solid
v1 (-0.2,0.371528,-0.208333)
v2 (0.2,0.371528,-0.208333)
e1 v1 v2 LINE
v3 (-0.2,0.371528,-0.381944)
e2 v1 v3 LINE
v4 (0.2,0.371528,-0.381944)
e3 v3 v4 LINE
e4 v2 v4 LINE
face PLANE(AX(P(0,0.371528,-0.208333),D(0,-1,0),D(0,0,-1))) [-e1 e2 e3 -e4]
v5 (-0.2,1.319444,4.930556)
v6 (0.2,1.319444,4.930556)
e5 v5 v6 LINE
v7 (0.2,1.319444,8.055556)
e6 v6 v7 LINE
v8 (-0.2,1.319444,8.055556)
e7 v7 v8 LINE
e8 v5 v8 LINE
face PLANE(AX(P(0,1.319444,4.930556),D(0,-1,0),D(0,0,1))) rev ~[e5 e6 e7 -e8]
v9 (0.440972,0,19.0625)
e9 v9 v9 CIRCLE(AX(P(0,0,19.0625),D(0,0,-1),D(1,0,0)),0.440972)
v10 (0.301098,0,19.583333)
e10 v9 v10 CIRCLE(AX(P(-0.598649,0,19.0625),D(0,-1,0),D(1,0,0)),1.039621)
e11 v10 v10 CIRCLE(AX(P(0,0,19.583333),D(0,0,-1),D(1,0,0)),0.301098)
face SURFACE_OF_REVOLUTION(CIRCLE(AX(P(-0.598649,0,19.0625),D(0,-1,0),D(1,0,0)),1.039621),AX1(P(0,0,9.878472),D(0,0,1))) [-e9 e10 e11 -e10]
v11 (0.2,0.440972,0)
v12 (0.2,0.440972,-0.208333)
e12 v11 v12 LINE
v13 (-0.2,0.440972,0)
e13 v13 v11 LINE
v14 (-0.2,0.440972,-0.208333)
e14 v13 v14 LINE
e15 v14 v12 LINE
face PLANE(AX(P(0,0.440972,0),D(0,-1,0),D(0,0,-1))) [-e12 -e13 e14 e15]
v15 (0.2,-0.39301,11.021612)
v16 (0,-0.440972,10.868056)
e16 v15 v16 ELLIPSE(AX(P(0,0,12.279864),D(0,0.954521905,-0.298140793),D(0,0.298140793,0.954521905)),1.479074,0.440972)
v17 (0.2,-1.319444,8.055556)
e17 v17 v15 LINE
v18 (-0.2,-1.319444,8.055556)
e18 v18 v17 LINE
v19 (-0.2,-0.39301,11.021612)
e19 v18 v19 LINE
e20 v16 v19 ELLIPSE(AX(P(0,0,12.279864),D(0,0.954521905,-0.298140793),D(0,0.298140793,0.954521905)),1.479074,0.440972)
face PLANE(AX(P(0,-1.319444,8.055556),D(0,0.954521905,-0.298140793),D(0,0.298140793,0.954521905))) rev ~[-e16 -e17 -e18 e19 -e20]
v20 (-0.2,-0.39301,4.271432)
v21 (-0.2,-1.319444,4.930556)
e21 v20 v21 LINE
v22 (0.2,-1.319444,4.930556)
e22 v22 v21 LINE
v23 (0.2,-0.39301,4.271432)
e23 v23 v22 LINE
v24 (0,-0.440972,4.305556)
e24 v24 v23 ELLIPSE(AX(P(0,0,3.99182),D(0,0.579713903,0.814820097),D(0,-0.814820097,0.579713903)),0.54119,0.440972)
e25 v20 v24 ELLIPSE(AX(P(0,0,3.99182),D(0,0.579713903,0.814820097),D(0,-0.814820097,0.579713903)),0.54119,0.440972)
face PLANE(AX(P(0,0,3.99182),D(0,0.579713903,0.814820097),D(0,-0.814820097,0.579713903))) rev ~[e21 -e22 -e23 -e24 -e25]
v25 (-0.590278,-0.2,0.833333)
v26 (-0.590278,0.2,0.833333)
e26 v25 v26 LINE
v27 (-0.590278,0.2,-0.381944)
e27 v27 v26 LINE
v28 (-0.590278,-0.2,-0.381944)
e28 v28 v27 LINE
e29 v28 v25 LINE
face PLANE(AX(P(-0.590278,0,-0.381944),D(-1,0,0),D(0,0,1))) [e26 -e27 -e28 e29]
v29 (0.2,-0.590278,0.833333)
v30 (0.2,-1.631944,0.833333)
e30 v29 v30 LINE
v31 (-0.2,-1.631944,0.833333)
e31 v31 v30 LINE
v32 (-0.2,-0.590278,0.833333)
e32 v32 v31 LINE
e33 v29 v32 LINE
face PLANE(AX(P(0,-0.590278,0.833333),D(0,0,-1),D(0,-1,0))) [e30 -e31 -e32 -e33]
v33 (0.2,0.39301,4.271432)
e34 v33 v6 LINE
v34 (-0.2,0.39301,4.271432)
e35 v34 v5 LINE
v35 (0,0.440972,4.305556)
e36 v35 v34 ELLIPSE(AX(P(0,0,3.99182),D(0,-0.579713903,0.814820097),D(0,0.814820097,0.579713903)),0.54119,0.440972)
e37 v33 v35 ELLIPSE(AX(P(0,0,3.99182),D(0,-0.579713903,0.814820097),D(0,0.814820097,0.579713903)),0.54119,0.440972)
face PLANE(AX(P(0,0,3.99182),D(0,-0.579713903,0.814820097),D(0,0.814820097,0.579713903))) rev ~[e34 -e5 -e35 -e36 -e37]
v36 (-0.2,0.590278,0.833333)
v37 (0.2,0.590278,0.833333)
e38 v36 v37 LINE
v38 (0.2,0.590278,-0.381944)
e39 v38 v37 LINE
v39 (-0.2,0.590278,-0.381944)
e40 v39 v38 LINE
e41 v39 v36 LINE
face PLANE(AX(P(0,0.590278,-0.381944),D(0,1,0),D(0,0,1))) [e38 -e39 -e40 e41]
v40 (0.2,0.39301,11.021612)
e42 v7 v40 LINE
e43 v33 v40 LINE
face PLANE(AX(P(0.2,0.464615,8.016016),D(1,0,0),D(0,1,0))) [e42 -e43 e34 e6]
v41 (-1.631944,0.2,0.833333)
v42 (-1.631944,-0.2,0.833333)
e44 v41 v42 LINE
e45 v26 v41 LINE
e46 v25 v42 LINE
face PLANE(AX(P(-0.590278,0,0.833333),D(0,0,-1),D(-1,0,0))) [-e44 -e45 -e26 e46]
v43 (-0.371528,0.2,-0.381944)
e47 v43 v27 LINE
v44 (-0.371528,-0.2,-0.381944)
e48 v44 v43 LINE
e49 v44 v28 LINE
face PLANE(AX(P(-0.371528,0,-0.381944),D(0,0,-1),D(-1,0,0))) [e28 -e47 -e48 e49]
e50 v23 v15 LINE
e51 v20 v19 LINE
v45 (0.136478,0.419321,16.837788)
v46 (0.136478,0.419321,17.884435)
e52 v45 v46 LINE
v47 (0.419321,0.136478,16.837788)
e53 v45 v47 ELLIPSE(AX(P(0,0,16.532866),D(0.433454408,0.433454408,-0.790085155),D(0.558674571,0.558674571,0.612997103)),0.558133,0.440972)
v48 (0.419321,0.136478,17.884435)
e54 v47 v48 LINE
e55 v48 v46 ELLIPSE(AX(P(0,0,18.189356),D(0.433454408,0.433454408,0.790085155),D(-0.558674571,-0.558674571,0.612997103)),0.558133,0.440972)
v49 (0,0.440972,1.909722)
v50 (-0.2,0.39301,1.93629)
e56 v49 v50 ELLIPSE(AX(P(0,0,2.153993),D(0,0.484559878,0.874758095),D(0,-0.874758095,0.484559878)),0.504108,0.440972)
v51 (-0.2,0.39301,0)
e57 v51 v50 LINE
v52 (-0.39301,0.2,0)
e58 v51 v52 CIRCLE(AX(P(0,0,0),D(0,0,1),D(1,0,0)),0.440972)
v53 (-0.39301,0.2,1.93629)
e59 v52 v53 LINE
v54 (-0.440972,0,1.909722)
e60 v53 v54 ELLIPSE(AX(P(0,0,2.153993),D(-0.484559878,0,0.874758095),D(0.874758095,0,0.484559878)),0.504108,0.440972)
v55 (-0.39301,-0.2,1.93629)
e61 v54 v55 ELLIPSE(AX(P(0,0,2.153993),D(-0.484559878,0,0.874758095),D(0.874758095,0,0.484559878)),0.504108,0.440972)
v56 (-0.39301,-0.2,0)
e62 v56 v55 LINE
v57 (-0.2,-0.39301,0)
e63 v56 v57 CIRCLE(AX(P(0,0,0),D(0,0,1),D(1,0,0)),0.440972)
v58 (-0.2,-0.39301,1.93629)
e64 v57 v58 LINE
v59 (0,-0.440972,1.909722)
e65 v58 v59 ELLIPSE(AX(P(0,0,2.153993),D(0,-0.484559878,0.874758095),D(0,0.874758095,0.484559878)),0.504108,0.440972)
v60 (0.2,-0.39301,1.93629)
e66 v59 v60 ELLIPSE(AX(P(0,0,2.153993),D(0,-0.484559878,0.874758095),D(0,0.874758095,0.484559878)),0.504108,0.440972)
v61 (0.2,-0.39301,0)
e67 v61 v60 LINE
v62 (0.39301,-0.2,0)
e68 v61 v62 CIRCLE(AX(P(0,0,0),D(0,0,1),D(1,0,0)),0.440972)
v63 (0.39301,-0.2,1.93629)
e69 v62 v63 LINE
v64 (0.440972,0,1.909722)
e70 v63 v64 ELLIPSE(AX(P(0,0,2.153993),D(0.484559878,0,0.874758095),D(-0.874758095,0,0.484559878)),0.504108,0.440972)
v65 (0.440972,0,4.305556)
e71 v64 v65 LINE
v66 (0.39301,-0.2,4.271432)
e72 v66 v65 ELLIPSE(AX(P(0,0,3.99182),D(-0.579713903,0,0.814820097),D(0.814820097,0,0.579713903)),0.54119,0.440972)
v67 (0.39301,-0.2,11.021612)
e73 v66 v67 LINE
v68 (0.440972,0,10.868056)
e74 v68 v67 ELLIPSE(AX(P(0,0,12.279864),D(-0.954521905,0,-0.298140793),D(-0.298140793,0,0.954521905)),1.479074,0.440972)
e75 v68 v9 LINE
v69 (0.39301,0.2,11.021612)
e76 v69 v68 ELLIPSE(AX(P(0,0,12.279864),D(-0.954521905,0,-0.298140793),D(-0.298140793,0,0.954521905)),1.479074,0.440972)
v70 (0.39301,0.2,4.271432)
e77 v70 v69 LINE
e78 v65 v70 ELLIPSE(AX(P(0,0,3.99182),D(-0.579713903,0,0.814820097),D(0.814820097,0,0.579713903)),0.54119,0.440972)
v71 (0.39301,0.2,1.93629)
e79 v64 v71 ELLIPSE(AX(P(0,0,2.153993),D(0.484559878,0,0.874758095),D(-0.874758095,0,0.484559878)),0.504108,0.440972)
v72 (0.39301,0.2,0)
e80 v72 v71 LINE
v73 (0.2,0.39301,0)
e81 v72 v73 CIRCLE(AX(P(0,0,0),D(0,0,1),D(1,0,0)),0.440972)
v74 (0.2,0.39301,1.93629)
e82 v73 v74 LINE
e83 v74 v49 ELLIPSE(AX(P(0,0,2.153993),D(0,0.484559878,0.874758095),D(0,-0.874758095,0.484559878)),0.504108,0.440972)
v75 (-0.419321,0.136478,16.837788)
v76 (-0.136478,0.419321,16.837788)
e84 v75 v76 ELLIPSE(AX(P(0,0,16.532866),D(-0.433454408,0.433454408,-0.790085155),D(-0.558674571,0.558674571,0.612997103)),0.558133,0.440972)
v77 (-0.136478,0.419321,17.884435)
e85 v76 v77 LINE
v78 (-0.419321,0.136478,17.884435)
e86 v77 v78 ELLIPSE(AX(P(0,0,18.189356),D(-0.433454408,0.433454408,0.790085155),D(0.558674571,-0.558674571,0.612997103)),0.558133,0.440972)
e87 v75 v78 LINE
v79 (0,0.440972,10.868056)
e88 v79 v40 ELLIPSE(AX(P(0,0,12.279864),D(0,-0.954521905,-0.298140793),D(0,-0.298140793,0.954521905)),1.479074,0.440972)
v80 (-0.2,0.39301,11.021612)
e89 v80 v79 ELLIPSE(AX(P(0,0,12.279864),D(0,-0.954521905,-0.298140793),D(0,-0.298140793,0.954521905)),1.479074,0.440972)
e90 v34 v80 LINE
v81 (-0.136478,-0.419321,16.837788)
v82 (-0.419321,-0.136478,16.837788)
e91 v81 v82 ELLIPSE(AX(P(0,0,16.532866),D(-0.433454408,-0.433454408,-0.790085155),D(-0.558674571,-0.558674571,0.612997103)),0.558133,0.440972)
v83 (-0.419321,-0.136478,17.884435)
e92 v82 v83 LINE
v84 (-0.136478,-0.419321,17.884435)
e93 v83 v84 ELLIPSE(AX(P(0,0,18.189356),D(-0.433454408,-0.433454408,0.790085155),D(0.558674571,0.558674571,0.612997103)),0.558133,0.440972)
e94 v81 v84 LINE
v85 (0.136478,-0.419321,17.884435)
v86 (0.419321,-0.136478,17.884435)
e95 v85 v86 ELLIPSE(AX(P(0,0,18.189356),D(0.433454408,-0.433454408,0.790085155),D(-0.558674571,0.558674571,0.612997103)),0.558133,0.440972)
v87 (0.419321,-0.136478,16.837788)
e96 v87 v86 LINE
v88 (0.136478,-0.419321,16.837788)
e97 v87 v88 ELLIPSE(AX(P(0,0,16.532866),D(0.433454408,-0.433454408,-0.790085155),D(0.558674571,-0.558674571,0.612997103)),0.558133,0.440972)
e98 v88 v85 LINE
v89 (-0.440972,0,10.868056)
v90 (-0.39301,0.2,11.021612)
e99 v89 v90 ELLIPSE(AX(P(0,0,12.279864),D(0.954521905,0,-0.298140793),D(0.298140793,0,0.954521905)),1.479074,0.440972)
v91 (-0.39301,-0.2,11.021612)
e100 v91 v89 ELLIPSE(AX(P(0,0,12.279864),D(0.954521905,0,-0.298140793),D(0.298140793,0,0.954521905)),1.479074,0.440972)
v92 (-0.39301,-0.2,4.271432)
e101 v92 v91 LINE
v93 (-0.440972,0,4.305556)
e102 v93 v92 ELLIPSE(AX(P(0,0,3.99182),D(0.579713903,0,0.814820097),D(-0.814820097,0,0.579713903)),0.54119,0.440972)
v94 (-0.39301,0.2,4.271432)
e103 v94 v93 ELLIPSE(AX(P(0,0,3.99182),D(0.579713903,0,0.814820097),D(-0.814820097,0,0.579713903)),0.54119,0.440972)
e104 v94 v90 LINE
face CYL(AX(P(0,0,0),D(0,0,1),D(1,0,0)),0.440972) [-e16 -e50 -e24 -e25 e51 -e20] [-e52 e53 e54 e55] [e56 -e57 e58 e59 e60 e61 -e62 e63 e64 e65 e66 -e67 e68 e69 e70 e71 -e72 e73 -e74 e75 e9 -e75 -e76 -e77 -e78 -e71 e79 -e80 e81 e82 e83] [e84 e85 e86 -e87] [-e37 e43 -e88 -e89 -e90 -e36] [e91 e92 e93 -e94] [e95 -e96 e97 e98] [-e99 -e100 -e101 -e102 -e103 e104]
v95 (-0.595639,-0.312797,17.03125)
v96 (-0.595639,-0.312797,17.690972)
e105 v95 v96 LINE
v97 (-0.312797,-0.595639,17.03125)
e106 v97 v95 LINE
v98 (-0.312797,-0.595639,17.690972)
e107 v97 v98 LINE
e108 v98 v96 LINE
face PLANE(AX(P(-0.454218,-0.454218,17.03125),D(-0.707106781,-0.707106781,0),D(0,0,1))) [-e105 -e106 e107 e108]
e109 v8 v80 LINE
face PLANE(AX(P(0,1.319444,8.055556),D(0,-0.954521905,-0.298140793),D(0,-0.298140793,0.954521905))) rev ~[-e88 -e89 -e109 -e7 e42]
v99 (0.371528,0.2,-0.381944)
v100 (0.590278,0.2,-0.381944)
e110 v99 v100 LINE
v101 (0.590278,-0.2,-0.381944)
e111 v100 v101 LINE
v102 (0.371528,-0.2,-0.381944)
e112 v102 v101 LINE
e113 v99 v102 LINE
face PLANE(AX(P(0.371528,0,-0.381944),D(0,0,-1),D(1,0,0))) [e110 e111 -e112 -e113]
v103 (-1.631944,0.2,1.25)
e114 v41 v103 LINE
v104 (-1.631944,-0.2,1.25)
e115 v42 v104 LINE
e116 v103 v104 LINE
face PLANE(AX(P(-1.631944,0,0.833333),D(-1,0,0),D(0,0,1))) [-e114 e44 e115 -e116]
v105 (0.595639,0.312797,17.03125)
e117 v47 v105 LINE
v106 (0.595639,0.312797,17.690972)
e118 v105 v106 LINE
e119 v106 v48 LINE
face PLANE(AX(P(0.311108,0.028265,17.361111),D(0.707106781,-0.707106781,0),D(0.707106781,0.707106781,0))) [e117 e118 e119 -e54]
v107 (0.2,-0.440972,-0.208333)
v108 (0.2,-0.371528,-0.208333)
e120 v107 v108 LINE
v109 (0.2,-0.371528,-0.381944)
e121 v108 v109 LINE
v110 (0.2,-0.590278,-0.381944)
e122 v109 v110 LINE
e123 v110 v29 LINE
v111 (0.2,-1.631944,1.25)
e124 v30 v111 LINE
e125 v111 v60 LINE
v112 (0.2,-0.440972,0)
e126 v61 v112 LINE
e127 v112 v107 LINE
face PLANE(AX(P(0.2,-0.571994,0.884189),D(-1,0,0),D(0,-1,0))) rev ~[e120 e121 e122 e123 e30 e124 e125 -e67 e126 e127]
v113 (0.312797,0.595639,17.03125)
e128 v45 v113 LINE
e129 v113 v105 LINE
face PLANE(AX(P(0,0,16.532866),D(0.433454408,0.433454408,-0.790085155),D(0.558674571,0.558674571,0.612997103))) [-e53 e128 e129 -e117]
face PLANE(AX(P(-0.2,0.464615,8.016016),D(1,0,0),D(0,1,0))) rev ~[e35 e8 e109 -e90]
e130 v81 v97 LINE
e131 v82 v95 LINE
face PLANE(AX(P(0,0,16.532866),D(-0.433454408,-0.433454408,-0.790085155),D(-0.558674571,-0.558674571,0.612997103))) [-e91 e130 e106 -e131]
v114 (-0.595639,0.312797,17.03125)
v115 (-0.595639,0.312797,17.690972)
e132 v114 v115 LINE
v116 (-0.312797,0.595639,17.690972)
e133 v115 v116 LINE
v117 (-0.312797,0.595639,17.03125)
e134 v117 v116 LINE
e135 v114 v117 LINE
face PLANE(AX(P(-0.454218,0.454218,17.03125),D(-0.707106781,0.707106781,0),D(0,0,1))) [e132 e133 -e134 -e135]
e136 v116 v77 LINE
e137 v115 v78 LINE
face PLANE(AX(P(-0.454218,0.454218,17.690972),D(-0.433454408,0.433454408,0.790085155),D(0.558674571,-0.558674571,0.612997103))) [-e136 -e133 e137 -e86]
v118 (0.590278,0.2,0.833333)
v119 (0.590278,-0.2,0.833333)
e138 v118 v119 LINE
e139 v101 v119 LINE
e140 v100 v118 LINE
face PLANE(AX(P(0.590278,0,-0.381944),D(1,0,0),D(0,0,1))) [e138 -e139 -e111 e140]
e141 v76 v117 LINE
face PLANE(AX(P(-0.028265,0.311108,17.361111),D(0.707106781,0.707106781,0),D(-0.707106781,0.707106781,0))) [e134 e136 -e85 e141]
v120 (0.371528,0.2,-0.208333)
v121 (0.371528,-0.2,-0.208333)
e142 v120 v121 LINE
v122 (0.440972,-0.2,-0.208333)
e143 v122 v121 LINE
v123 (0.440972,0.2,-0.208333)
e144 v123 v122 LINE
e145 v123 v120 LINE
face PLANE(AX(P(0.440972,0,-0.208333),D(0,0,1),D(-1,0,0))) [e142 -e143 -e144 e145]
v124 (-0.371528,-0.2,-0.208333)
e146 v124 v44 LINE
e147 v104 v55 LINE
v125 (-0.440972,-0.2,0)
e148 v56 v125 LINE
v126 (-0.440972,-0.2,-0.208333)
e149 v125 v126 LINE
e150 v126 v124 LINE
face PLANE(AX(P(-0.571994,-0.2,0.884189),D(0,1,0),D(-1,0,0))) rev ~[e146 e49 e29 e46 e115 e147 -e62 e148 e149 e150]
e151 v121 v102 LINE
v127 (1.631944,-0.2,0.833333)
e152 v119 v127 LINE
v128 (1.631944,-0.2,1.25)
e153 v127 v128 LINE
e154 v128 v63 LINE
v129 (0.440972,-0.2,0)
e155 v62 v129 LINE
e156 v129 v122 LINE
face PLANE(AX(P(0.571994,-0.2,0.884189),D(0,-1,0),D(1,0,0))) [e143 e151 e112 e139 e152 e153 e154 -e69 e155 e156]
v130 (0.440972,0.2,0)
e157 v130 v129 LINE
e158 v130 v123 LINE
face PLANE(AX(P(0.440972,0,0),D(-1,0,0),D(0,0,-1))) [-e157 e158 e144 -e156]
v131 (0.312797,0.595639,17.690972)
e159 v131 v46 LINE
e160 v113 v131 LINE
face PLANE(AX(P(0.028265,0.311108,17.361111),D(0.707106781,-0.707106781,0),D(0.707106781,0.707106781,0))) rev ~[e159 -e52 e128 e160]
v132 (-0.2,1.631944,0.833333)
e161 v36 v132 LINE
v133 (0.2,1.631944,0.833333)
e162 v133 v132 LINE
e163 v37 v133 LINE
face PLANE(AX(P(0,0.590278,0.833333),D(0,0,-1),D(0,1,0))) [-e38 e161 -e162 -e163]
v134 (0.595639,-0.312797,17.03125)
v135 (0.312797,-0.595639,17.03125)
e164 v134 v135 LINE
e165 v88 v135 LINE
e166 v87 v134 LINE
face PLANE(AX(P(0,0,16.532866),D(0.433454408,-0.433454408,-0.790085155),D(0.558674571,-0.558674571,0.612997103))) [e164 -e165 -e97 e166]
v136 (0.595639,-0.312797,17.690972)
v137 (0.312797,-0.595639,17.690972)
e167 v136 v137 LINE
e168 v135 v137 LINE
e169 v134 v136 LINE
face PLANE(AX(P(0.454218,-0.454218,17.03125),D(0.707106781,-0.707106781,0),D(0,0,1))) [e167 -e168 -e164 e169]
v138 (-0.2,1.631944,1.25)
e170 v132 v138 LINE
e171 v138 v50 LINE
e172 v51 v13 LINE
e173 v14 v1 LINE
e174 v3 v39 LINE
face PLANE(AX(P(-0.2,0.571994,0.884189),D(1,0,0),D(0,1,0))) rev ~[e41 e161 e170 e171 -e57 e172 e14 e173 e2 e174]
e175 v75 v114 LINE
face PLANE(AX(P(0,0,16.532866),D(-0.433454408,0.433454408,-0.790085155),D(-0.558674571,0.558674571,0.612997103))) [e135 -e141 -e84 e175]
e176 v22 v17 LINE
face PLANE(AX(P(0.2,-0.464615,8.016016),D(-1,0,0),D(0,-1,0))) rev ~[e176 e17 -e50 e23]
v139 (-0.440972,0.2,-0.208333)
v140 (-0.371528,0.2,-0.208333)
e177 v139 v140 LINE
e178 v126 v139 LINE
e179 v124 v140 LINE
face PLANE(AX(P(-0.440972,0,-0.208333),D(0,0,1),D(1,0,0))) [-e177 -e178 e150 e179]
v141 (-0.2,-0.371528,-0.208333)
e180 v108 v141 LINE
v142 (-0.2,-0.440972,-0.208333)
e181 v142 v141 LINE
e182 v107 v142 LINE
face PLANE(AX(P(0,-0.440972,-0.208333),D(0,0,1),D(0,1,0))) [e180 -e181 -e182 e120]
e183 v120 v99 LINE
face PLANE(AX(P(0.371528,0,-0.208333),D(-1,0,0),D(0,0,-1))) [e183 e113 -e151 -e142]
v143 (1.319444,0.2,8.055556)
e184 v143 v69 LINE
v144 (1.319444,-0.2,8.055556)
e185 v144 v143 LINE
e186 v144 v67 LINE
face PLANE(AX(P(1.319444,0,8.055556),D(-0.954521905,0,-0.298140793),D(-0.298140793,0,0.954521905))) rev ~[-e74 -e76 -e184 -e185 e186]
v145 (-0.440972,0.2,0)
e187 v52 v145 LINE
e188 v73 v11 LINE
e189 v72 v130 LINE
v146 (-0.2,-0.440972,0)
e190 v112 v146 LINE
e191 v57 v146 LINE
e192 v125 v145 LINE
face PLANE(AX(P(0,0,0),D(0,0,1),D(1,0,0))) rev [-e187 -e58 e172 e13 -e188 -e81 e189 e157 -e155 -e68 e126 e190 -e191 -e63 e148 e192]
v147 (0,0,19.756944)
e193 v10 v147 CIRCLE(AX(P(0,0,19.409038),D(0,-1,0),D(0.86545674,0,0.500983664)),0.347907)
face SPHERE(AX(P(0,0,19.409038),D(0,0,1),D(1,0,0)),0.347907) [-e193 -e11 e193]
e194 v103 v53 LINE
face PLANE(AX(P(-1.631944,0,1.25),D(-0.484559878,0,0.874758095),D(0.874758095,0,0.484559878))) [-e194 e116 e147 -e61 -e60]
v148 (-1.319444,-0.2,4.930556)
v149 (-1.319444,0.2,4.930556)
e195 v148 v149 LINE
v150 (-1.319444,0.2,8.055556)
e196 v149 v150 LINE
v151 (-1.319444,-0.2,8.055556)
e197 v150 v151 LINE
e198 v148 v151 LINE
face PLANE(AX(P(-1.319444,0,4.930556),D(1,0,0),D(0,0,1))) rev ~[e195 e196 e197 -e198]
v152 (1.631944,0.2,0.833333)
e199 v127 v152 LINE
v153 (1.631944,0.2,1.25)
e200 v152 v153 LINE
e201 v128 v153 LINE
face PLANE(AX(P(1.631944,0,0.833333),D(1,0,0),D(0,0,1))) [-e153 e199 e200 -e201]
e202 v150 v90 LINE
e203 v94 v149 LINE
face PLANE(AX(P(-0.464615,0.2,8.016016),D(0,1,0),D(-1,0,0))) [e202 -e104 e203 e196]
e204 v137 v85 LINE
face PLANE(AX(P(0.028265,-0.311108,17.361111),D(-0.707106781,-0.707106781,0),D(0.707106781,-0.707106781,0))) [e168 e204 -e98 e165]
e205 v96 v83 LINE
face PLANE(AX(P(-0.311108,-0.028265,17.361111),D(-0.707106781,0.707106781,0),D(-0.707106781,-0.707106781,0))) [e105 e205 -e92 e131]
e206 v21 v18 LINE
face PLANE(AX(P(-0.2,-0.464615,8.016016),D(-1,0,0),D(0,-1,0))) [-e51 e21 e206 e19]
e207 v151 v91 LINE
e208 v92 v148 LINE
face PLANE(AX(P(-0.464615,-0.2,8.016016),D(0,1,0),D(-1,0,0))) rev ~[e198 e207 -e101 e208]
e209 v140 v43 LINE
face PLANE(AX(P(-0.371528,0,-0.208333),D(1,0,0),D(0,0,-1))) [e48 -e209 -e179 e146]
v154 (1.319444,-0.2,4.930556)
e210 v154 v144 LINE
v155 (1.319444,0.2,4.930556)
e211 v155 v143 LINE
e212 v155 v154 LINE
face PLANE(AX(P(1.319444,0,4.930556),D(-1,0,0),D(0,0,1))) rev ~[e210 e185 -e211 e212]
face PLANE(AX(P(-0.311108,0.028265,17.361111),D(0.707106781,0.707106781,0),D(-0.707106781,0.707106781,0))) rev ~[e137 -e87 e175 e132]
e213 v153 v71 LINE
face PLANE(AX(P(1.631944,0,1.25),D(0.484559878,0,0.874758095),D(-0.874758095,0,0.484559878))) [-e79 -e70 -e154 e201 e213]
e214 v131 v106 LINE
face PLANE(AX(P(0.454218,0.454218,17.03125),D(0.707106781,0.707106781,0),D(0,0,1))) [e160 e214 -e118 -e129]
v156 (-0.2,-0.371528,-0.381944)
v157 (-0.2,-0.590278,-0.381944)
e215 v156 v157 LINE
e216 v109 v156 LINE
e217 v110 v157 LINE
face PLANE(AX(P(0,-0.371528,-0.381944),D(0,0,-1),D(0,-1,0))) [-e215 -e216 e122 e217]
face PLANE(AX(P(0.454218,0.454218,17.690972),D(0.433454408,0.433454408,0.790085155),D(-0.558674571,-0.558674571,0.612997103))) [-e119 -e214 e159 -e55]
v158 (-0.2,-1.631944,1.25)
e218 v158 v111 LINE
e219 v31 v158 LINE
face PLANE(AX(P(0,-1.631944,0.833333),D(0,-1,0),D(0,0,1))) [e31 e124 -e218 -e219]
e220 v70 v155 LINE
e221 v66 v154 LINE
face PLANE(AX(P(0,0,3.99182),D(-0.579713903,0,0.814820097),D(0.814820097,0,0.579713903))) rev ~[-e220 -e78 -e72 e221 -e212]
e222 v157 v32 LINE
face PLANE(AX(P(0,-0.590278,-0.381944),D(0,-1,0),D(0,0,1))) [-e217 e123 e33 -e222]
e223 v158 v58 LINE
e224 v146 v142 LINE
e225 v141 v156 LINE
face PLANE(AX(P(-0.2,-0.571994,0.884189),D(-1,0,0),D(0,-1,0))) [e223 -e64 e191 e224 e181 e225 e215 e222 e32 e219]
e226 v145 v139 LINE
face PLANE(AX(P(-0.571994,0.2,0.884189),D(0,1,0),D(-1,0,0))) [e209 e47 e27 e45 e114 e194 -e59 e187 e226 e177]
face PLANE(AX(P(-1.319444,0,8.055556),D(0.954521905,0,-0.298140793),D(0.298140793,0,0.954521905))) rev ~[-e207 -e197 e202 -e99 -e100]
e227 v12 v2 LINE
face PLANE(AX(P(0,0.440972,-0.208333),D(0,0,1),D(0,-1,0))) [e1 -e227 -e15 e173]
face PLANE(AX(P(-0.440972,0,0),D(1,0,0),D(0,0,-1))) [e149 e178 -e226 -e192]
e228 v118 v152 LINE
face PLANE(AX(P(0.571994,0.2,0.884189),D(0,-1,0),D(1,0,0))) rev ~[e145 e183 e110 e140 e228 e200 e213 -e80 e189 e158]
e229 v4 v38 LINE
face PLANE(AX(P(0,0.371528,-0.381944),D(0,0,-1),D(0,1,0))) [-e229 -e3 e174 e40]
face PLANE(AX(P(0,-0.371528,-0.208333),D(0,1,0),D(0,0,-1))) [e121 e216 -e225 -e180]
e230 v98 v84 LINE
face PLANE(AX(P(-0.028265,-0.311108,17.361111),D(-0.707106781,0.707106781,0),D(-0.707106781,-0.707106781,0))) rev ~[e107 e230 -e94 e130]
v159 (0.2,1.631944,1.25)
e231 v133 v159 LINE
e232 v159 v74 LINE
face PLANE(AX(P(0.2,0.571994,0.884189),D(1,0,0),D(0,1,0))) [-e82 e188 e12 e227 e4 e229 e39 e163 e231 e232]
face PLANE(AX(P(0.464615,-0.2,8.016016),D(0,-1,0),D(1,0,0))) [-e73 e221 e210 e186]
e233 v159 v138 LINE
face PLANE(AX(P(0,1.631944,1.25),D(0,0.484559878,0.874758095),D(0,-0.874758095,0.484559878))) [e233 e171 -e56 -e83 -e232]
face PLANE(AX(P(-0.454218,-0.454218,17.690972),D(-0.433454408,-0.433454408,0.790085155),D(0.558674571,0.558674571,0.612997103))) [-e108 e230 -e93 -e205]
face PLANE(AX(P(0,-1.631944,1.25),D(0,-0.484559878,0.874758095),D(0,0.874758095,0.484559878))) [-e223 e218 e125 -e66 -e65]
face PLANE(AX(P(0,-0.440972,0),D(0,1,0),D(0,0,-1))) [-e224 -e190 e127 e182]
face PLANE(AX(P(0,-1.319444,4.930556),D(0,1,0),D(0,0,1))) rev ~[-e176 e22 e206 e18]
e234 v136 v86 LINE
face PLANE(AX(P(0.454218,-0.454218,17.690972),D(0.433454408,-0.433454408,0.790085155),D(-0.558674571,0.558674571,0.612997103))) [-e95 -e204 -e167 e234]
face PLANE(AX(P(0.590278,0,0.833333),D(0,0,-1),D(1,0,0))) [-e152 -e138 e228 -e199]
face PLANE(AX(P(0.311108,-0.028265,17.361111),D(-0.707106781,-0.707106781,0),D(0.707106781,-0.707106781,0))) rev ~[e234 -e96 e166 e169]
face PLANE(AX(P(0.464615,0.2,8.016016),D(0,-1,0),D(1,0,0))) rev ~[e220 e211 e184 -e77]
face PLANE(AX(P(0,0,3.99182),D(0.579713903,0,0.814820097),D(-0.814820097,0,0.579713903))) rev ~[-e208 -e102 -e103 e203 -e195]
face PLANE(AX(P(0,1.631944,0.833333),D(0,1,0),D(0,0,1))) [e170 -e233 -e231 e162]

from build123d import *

# Parameters (mm, degrees)
F3_DEPTH = 0.2
F6_DEPTH = 0.2
F7_COUNT = 4


# Not quite as in the source:
# - a feature names something its author has since deleted; it is built from what else it names


with BuildPart() as f1:
    # F0 (on Front) → F1 (revolve)
    with BuildSketch(Plane.XZ):
        with BuildLine():
            Line((0, 19.7569444444), (0, 0))
            Line((0, 0), (0.4409722222, 0))
            Line((0.4409722222, 0), (0.4409722222, 19.0625))
            ThreePointArc((0.4409722222, 19.0625), (0.4053949582, 19.3321442616), (0.3010981711, 19.5833333333))
            ThreePointArc((0.3010981711, 19.5833333333), (0.1737821384, 19.7104325641), (0, 19.7569444444))
        make_face()
    revolve(axis=Axis((0, 0, 9.8784722222), (0, 0, 1)))

    # F2 (on Front) → F3 (join, symmetric)
    with BuildSketch(Plane.XZ):
        Polygon((0, 12.279863856), (0, 3.9918203777), (1.3194444444, 4.9305555556), (1.3194444444, 8.0555555556), align=None)
        Polygon((0, 2.1539925494), (0, 0), (0.4409722222, 0), (0.4409722222, -0.2083333333), (0.3715277778, -0.2083333333), (0.3715277778, -0.3819444444), (0.5902777778, -0.3819444444), (0.5902777778, 0.8333333333), (1.6319444444, 0.8333333333), (1.6319444444, 1.25), align=None)
    extrude(amount=F3_DEPTH, both=True)

    # F5 (on face) → F6 (join, symmetric)
    with BuildSketch(Plane(origin=(0, 0, 0), x_dir=(0.7071067812, -0.7071067812, 0), z_dir=(-0.7071067812, -0.7071067812, 0))):
        Polygon((0, 16.5328663793), (0.6423611111, 17.03125), (0.6423611111, 17.6909722222), (0, 18.1893558429), align=None)
    extrude(amount=F6_DEPTH, both=True)

    # F7: F1 ×4 about axis
    f7_axis = Axis((0, 0, 0), (0, 0, 1))


with BuildPart() as f1_1:
    add(f1.part)
    for i in range(1, F7_COUNT):
        add(f1.part.rotate(f7_axis, i * 360 / F7_COUNT))


solid = f1_1.part
